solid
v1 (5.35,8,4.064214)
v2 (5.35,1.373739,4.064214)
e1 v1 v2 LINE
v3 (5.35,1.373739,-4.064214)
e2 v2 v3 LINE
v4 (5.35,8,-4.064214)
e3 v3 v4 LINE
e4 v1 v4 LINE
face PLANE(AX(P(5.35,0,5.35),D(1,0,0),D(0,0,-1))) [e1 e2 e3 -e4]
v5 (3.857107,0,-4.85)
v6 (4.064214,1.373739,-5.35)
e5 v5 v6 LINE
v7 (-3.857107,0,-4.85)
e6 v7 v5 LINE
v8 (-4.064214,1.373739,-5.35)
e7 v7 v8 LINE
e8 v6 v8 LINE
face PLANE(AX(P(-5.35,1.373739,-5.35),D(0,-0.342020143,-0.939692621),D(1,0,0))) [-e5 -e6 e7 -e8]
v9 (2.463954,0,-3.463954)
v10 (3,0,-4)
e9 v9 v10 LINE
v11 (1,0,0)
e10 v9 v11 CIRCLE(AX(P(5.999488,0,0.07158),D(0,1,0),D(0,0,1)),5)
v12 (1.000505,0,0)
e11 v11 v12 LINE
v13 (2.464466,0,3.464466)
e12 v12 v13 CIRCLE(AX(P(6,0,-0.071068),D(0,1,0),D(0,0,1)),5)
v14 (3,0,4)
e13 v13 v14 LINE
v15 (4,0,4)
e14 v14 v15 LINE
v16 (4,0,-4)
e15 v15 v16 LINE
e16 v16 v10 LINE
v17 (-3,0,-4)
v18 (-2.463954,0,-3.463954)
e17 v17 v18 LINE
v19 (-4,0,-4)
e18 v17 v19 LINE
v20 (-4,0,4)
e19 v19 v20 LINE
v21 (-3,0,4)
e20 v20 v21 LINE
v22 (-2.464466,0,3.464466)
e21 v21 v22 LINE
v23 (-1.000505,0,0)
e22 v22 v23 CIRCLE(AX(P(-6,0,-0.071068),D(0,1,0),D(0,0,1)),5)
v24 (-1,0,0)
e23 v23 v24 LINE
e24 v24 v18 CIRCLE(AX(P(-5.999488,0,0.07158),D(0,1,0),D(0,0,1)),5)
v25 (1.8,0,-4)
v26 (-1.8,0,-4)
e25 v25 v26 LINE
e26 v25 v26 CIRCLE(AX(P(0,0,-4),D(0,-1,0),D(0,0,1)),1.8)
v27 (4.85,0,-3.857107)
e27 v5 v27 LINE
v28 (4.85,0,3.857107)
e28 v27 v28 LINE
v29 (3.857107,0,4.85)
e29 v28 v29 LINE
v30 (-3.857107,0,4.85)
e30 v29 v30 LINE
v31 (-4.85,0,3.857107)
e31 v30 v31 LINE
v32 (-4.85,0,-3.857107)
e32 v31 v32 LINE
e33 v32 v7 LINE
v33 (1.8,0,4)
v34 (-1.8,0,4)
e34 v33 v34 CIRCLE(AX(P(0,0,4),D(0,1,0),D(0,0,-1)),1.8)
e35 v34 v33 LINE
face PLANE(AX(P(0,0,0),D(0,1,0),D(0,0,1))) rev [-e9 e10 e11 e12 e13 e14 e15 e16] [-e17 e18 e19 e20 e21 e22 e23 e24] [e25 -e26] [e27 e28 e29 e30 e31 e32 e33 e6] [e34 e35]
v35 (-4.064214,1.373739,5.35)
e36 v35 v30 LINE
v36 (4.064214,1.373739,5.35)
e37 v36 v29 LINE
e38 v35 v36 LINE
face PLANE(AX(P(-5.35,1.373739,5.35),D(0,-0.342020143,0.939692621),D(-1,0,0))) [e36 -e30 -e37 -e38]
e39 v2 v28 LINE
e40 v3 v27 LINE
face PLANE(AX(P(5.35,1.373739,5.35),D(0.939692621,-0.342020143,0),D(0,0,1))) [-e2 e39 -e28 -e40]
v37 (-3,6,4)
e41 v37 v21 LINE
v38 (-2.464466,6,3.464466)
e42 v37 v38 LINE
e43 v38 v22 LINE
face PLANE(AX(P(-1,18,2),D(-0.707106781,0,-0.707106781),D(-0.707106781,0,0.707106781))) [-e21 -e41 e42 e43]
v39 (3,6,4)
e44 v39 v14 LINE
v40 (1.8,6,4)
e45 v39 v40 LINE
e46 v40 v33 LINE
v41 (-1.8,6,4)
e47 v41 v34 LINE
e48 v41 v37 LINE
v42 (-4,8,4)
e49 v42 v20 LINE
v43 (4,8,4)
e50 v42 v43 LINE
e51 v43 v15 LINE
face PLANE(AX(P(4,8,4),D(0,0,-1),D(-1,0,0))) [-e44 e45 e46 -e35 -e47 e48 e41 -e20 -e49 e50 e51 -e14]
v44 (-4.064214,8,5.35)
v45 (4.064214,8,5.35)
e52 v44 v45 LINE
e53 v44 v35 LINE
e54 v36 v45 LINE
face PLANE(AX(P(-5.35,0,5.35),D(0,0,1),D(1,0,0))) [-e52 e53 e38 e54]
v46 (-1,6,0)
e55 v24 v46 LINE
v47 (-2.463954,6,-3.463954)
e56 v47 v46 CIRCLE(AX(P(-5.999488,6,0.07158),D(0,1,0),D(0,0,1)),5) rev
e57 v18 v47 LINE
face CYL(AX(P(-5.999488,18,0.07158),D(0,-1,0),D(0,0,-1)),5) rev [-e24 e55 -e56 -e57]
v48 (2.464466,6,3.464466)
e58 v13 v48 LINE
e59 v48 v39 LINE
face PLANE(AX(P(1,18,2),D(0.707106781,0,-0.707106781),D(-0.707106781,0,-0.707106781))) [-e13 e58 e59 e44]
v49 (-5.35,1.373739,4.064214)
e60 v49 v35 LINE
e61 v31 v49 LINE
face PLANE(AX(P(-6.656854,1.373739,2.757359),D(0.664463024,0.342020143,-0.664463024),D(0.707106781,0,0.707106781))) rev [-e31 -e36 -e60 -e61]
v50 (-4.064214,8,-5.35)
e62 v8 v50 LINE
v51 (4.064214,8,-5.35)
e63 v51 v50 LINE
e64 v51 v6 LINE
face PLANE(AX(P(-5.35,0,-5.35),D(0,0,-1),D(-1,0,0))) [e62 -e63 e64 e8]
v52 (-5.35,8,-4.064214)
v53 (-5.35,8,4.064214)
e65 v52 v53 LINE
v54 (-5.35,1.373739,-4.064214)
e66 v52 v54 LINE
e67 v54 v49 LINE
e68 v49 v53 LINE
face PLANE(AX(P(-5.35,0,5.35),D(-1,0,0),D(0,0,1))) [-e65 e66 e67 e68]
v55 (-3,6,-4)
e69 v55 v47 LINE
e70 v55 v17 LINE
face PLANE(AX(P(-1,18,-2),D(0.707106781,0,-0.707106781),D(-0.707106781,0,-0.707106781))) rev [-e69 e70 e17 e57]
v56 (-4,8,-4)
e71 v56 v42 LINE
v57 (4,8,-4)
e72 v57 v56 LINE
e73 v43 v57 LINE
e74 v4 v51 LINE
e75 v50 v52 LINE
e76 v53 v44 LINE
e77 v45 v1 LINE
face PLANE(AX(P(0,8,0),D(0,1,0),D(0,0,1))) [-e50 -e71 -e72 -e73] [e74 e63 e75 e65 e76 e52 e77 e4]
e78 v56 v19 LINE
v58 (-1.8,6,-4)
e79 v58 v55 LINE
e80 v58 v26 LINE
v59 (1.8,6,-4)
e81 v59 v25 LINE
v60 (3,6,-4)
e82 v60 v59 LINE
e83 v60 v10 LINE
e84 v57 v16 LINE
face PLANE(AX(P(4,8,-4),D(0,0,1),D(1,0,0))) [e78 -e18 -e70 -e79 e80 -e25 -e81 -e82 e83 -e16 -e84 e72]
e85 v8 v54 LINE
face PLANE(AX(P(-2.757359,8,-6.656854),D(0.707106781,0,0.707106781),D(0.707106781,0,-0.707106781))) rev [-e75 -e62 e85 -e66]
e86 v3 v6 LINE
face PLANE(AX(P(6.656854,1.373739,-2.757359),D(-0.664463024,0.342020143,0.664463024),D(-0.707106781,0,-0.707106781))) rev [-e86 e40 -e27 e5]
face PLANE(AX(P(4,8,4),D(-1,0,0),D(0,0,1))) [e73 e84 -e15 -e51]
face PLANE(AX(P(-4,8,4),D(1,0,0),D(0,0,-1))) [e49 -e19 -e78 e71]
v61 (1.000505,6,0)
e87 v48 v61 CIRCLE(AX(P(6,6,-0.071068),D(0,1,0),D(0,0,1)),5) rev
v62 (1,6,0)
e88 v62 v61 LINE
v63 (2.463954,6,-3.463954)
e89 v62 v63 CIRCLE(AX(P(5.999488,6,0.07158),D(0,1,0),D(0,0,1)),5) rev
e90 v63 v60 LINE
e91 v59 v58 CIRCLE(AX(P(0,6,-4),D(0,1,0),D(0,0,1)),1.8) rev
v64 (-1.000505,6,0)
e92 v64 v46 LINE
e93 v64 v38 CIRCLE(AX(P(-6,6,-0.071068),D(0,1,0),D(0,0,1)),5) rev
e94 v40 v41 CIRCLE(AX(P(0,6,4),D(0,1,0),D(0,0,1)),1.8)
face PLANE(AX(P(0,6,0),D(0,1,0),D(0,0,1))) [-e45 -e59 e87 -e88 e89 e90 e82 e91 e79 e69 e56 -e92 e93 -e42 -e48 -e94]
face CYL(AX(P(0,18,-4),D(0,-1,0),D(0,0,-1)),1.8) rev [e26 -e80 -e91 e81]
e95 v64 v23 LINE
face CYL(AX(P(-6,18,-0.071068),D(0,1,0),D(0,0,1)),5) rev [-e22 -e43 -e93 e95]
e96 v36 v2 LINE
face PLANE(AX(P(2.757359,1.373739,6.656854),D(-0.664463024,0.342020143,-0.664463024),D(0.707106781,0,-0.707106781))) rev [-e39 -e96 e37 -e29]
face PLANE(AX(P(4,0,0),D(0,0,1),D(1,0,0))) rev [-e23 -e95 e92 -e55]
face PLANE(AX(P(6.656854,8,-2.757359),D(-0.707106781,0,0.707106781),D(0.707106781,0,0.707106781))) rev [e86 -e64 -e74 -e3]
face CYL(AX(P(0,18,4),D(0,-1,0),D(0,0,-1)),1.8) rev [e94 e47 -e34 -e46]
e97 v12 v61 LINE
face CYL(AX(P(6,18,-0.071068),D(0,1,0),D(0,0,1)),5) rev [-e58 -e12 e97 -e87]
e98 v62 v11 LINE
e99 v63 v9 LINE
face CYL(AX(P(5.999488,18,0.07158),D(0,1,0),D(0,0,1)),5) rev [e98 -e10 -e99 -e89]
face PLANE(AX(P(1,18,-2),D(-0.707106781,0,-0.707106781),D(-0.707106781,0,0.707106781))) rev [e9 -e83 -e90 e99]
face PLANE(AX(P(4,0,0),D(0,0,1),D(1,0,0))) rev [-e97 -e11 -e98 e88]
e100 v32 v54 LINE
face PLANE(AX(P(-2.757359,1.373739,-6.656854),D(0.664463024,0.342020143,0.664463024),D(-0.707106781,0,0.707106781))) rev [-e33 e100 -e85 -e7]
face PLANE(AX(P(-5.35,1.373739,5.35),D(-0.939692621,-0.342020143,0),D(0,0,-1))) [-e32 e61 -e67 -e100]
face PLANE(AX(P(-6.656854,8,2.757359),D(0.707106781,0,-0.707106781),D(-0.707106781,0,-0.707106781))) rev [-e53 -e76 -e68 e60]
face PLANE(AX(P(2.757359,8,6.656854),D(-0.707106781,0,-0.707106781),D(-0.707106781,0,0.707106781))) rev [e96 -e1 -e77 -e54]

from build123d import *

# Parameters (mm, degrees)
SKETCH1_W           = 8
SKETCH1_H           = 8
BOSS_EXTRUDE1_DEPTH = 8
BOSS_EXTRUDE2_DEPTH = 6
SKETCH3_OUTSIDE_W   = 19.406
SKETCH3_OUTSIDE_H   = 19.406
SKETCH3_OUTSIDE_W_2 = 10.7
SKETCH3_OUTSIDE_H_2 = 10.7
CUT_EXTRUDE2_DEPTH  = 13.354246922
CHAMFER1_SIZE       = 0.5
CHAMFER1_SIZE2      = 1.37373871
FILLET2_R           = 5
SKETCH6_W           = 8
SKETCH6_H           = 4
CUT_EXTRUDE4_DEPTH  = 12.011130732
MIRROR1_DEPTH       = 6
CUT_EXTRUDE5_DEPTH  = 10.656345064


# Read off the part's stored shape, not the designer's step: Mirror1
with BuildPart() as part:
    # Sketch1 → Boss-Extrude1 (new body)
    with BuildSketch(Plane(origin=(0, 0, 0), x_dir=(1, 0, 0), z_dir=(0, 1, 0))):
        Polygon((6.656854249, -2.757359313), (6.656854249, 2.757359313), (2.757359313, 6.656854249), (-2.757359313, 6.656854249), (-6.656854249, 2.757359313), (-6.656854249, -2.757359313), (-2.757359313, -6.656854249), (2.757359313, -6.656854249), align=None)
        Rectangle(SKETCH1_W, SKETCH1_H, mode=Mode.SUBTRACT)
    extrude(amount=BOSS_EXTRUDE1_DEPTH)

    # Sketch2 → Boss-Extrude2 (add)
    with BuildSketch(Plane.XZ):
        with BuildLine():
            Line((1, 2), (3, 4))
            Line((3, 4), (1.8, 4))
            ThreePointArc((1.8, 4), (0, 2.2), (-1.8, 4))
            Line((-1.8, 4), (-3, 4))
            Line((-3, 4), (-1, 2))
            Line((-1, 2), (-1, -4))
            Line((-1, -4), (1, -4))
            Line((1, -4), (1, 2))
        make_face()
    extrude(amount=-BOSS_EXTRUDE2_DEPTH)

    # Sketch3 outside → Cut-Extrude2 (cut, through all)
    with BuildSketch(Plane(origin=(0, 8, 0), x_dir=(1, 0, 0), z_dir=(0, 1, 0))):
        Rectangle(SKETCH3_OUTSIDE_W, SKETCH3_OUTSIDE_H)
        Rectangle(SKETCH3_OUTSIDE_W_2, SKETCH3_OUTSIDE_H_2, mode=Mode.SUBTRACT)
    extrude(amount=-CUT_EXTRUDE2_DEPTH, mode=Mode.SUBTRACT)

    # Chamfer1
    chamfer1_edges = [part.edges().sort_by_distance(p)[0] for p in [
        (-4.707106781, 0, 4.707106781),
        (-4.707106781, 0, -4.707106781),
        (4.707106781, 0, -4.707106781),
        (4.707106781, 0, 4.707106781),
        (5.35, 0, 0),
        (0, 0, -5.35),
        (-5.35, 0, 0),
        (0, 0, 5.35),
    ]]
    chamfer1_side = [part.faces().sort_by_distance(p)[0] for p in [
        (0, 0, -0.050506984),
    ]]
    chamfer(chamfer1_edges, length=CHAMFER1_SIZE, length2=CHAMFER1_SIZE2, reference=chamfer1_side[0])

    # Fillet2
    fillet2_edges = [part.edges().sort_by_distance(p)[0] for p in [
        (-1, 3, 2),
        (1, 3, 2),
    ]]
    fillet(fillet2_edges, radius=FILLET2_R)

    # Sketch6 → Cut-Extrude4 (cut, through all)
    with BuildSketch(Plane(origin=(0, 8, 0), x_dir=(1, 0, 0), z_dir=(0, 1, 0))):
        with Locations((0, 2)):
            Rectangle(SKETCH6_W, SKETCH6_H)
    extrude(amount=-CUT_EXTRUDE4_DEPTH, mode=Mode.SUBTRACT)

    # Mirror1 outline → Mirror1 (add)
    with BuildSketch(Plane(origin=(0, 0, 0), x_dir=(1, 0, 0), z_dir=(0, 1, 0))):
        with BuildLine():
            Line((-3, 4), (-2.463953695, 3.463953695))
            ThreePointArc((-2.463953695, 3.463953695), (-1.39390492, 1.874854522), (-1, 0))
            Line((-1, 0), (1, 0))
            ThreePointArc((1, 0), (1.39390492, 1.874854522), (2.463953695, 3.463953695))
            Line((2.463953695, 3.463953695), (3, 4))
            Line((3, 4), (1.8, 4))
            ThreePointArc((1.8, 4), (0, 2.2), (-1.8, 4))
            Line((-1.8, 4), (-3, 4))
        make_face()
        with BuildLine():
            Line((1, -4), (1, -2.503337045))
            ThreePointArc((1, -2.503337045), (0, -2.2), (-1, -2.503337045))
            Line((-1, -2.503337045), (-1, -4))
            Line((-1, -4), (1, -4))
        make_face()
    extrude(amount=MIRROR1_DEPTH)

    # Sketch8 → Cut-Extrude5 (cut, through all)
    with BuildSketch(Plane(origin=(0, 6, 0), x_dir=(1, 0, 0), z_dir=(0, 1, 0))):
        with BuildLine():
            Line((1.8, -4), (-1.8, -4))
            ThreePointArc((-1.8, -4), (0, -2.2), (1.8, -4))
        make_face()
    extrude(amount=-CUT_EXTRUDE5_DEPTH, mode=Mode.SUBTRACT)


solid = part.part
